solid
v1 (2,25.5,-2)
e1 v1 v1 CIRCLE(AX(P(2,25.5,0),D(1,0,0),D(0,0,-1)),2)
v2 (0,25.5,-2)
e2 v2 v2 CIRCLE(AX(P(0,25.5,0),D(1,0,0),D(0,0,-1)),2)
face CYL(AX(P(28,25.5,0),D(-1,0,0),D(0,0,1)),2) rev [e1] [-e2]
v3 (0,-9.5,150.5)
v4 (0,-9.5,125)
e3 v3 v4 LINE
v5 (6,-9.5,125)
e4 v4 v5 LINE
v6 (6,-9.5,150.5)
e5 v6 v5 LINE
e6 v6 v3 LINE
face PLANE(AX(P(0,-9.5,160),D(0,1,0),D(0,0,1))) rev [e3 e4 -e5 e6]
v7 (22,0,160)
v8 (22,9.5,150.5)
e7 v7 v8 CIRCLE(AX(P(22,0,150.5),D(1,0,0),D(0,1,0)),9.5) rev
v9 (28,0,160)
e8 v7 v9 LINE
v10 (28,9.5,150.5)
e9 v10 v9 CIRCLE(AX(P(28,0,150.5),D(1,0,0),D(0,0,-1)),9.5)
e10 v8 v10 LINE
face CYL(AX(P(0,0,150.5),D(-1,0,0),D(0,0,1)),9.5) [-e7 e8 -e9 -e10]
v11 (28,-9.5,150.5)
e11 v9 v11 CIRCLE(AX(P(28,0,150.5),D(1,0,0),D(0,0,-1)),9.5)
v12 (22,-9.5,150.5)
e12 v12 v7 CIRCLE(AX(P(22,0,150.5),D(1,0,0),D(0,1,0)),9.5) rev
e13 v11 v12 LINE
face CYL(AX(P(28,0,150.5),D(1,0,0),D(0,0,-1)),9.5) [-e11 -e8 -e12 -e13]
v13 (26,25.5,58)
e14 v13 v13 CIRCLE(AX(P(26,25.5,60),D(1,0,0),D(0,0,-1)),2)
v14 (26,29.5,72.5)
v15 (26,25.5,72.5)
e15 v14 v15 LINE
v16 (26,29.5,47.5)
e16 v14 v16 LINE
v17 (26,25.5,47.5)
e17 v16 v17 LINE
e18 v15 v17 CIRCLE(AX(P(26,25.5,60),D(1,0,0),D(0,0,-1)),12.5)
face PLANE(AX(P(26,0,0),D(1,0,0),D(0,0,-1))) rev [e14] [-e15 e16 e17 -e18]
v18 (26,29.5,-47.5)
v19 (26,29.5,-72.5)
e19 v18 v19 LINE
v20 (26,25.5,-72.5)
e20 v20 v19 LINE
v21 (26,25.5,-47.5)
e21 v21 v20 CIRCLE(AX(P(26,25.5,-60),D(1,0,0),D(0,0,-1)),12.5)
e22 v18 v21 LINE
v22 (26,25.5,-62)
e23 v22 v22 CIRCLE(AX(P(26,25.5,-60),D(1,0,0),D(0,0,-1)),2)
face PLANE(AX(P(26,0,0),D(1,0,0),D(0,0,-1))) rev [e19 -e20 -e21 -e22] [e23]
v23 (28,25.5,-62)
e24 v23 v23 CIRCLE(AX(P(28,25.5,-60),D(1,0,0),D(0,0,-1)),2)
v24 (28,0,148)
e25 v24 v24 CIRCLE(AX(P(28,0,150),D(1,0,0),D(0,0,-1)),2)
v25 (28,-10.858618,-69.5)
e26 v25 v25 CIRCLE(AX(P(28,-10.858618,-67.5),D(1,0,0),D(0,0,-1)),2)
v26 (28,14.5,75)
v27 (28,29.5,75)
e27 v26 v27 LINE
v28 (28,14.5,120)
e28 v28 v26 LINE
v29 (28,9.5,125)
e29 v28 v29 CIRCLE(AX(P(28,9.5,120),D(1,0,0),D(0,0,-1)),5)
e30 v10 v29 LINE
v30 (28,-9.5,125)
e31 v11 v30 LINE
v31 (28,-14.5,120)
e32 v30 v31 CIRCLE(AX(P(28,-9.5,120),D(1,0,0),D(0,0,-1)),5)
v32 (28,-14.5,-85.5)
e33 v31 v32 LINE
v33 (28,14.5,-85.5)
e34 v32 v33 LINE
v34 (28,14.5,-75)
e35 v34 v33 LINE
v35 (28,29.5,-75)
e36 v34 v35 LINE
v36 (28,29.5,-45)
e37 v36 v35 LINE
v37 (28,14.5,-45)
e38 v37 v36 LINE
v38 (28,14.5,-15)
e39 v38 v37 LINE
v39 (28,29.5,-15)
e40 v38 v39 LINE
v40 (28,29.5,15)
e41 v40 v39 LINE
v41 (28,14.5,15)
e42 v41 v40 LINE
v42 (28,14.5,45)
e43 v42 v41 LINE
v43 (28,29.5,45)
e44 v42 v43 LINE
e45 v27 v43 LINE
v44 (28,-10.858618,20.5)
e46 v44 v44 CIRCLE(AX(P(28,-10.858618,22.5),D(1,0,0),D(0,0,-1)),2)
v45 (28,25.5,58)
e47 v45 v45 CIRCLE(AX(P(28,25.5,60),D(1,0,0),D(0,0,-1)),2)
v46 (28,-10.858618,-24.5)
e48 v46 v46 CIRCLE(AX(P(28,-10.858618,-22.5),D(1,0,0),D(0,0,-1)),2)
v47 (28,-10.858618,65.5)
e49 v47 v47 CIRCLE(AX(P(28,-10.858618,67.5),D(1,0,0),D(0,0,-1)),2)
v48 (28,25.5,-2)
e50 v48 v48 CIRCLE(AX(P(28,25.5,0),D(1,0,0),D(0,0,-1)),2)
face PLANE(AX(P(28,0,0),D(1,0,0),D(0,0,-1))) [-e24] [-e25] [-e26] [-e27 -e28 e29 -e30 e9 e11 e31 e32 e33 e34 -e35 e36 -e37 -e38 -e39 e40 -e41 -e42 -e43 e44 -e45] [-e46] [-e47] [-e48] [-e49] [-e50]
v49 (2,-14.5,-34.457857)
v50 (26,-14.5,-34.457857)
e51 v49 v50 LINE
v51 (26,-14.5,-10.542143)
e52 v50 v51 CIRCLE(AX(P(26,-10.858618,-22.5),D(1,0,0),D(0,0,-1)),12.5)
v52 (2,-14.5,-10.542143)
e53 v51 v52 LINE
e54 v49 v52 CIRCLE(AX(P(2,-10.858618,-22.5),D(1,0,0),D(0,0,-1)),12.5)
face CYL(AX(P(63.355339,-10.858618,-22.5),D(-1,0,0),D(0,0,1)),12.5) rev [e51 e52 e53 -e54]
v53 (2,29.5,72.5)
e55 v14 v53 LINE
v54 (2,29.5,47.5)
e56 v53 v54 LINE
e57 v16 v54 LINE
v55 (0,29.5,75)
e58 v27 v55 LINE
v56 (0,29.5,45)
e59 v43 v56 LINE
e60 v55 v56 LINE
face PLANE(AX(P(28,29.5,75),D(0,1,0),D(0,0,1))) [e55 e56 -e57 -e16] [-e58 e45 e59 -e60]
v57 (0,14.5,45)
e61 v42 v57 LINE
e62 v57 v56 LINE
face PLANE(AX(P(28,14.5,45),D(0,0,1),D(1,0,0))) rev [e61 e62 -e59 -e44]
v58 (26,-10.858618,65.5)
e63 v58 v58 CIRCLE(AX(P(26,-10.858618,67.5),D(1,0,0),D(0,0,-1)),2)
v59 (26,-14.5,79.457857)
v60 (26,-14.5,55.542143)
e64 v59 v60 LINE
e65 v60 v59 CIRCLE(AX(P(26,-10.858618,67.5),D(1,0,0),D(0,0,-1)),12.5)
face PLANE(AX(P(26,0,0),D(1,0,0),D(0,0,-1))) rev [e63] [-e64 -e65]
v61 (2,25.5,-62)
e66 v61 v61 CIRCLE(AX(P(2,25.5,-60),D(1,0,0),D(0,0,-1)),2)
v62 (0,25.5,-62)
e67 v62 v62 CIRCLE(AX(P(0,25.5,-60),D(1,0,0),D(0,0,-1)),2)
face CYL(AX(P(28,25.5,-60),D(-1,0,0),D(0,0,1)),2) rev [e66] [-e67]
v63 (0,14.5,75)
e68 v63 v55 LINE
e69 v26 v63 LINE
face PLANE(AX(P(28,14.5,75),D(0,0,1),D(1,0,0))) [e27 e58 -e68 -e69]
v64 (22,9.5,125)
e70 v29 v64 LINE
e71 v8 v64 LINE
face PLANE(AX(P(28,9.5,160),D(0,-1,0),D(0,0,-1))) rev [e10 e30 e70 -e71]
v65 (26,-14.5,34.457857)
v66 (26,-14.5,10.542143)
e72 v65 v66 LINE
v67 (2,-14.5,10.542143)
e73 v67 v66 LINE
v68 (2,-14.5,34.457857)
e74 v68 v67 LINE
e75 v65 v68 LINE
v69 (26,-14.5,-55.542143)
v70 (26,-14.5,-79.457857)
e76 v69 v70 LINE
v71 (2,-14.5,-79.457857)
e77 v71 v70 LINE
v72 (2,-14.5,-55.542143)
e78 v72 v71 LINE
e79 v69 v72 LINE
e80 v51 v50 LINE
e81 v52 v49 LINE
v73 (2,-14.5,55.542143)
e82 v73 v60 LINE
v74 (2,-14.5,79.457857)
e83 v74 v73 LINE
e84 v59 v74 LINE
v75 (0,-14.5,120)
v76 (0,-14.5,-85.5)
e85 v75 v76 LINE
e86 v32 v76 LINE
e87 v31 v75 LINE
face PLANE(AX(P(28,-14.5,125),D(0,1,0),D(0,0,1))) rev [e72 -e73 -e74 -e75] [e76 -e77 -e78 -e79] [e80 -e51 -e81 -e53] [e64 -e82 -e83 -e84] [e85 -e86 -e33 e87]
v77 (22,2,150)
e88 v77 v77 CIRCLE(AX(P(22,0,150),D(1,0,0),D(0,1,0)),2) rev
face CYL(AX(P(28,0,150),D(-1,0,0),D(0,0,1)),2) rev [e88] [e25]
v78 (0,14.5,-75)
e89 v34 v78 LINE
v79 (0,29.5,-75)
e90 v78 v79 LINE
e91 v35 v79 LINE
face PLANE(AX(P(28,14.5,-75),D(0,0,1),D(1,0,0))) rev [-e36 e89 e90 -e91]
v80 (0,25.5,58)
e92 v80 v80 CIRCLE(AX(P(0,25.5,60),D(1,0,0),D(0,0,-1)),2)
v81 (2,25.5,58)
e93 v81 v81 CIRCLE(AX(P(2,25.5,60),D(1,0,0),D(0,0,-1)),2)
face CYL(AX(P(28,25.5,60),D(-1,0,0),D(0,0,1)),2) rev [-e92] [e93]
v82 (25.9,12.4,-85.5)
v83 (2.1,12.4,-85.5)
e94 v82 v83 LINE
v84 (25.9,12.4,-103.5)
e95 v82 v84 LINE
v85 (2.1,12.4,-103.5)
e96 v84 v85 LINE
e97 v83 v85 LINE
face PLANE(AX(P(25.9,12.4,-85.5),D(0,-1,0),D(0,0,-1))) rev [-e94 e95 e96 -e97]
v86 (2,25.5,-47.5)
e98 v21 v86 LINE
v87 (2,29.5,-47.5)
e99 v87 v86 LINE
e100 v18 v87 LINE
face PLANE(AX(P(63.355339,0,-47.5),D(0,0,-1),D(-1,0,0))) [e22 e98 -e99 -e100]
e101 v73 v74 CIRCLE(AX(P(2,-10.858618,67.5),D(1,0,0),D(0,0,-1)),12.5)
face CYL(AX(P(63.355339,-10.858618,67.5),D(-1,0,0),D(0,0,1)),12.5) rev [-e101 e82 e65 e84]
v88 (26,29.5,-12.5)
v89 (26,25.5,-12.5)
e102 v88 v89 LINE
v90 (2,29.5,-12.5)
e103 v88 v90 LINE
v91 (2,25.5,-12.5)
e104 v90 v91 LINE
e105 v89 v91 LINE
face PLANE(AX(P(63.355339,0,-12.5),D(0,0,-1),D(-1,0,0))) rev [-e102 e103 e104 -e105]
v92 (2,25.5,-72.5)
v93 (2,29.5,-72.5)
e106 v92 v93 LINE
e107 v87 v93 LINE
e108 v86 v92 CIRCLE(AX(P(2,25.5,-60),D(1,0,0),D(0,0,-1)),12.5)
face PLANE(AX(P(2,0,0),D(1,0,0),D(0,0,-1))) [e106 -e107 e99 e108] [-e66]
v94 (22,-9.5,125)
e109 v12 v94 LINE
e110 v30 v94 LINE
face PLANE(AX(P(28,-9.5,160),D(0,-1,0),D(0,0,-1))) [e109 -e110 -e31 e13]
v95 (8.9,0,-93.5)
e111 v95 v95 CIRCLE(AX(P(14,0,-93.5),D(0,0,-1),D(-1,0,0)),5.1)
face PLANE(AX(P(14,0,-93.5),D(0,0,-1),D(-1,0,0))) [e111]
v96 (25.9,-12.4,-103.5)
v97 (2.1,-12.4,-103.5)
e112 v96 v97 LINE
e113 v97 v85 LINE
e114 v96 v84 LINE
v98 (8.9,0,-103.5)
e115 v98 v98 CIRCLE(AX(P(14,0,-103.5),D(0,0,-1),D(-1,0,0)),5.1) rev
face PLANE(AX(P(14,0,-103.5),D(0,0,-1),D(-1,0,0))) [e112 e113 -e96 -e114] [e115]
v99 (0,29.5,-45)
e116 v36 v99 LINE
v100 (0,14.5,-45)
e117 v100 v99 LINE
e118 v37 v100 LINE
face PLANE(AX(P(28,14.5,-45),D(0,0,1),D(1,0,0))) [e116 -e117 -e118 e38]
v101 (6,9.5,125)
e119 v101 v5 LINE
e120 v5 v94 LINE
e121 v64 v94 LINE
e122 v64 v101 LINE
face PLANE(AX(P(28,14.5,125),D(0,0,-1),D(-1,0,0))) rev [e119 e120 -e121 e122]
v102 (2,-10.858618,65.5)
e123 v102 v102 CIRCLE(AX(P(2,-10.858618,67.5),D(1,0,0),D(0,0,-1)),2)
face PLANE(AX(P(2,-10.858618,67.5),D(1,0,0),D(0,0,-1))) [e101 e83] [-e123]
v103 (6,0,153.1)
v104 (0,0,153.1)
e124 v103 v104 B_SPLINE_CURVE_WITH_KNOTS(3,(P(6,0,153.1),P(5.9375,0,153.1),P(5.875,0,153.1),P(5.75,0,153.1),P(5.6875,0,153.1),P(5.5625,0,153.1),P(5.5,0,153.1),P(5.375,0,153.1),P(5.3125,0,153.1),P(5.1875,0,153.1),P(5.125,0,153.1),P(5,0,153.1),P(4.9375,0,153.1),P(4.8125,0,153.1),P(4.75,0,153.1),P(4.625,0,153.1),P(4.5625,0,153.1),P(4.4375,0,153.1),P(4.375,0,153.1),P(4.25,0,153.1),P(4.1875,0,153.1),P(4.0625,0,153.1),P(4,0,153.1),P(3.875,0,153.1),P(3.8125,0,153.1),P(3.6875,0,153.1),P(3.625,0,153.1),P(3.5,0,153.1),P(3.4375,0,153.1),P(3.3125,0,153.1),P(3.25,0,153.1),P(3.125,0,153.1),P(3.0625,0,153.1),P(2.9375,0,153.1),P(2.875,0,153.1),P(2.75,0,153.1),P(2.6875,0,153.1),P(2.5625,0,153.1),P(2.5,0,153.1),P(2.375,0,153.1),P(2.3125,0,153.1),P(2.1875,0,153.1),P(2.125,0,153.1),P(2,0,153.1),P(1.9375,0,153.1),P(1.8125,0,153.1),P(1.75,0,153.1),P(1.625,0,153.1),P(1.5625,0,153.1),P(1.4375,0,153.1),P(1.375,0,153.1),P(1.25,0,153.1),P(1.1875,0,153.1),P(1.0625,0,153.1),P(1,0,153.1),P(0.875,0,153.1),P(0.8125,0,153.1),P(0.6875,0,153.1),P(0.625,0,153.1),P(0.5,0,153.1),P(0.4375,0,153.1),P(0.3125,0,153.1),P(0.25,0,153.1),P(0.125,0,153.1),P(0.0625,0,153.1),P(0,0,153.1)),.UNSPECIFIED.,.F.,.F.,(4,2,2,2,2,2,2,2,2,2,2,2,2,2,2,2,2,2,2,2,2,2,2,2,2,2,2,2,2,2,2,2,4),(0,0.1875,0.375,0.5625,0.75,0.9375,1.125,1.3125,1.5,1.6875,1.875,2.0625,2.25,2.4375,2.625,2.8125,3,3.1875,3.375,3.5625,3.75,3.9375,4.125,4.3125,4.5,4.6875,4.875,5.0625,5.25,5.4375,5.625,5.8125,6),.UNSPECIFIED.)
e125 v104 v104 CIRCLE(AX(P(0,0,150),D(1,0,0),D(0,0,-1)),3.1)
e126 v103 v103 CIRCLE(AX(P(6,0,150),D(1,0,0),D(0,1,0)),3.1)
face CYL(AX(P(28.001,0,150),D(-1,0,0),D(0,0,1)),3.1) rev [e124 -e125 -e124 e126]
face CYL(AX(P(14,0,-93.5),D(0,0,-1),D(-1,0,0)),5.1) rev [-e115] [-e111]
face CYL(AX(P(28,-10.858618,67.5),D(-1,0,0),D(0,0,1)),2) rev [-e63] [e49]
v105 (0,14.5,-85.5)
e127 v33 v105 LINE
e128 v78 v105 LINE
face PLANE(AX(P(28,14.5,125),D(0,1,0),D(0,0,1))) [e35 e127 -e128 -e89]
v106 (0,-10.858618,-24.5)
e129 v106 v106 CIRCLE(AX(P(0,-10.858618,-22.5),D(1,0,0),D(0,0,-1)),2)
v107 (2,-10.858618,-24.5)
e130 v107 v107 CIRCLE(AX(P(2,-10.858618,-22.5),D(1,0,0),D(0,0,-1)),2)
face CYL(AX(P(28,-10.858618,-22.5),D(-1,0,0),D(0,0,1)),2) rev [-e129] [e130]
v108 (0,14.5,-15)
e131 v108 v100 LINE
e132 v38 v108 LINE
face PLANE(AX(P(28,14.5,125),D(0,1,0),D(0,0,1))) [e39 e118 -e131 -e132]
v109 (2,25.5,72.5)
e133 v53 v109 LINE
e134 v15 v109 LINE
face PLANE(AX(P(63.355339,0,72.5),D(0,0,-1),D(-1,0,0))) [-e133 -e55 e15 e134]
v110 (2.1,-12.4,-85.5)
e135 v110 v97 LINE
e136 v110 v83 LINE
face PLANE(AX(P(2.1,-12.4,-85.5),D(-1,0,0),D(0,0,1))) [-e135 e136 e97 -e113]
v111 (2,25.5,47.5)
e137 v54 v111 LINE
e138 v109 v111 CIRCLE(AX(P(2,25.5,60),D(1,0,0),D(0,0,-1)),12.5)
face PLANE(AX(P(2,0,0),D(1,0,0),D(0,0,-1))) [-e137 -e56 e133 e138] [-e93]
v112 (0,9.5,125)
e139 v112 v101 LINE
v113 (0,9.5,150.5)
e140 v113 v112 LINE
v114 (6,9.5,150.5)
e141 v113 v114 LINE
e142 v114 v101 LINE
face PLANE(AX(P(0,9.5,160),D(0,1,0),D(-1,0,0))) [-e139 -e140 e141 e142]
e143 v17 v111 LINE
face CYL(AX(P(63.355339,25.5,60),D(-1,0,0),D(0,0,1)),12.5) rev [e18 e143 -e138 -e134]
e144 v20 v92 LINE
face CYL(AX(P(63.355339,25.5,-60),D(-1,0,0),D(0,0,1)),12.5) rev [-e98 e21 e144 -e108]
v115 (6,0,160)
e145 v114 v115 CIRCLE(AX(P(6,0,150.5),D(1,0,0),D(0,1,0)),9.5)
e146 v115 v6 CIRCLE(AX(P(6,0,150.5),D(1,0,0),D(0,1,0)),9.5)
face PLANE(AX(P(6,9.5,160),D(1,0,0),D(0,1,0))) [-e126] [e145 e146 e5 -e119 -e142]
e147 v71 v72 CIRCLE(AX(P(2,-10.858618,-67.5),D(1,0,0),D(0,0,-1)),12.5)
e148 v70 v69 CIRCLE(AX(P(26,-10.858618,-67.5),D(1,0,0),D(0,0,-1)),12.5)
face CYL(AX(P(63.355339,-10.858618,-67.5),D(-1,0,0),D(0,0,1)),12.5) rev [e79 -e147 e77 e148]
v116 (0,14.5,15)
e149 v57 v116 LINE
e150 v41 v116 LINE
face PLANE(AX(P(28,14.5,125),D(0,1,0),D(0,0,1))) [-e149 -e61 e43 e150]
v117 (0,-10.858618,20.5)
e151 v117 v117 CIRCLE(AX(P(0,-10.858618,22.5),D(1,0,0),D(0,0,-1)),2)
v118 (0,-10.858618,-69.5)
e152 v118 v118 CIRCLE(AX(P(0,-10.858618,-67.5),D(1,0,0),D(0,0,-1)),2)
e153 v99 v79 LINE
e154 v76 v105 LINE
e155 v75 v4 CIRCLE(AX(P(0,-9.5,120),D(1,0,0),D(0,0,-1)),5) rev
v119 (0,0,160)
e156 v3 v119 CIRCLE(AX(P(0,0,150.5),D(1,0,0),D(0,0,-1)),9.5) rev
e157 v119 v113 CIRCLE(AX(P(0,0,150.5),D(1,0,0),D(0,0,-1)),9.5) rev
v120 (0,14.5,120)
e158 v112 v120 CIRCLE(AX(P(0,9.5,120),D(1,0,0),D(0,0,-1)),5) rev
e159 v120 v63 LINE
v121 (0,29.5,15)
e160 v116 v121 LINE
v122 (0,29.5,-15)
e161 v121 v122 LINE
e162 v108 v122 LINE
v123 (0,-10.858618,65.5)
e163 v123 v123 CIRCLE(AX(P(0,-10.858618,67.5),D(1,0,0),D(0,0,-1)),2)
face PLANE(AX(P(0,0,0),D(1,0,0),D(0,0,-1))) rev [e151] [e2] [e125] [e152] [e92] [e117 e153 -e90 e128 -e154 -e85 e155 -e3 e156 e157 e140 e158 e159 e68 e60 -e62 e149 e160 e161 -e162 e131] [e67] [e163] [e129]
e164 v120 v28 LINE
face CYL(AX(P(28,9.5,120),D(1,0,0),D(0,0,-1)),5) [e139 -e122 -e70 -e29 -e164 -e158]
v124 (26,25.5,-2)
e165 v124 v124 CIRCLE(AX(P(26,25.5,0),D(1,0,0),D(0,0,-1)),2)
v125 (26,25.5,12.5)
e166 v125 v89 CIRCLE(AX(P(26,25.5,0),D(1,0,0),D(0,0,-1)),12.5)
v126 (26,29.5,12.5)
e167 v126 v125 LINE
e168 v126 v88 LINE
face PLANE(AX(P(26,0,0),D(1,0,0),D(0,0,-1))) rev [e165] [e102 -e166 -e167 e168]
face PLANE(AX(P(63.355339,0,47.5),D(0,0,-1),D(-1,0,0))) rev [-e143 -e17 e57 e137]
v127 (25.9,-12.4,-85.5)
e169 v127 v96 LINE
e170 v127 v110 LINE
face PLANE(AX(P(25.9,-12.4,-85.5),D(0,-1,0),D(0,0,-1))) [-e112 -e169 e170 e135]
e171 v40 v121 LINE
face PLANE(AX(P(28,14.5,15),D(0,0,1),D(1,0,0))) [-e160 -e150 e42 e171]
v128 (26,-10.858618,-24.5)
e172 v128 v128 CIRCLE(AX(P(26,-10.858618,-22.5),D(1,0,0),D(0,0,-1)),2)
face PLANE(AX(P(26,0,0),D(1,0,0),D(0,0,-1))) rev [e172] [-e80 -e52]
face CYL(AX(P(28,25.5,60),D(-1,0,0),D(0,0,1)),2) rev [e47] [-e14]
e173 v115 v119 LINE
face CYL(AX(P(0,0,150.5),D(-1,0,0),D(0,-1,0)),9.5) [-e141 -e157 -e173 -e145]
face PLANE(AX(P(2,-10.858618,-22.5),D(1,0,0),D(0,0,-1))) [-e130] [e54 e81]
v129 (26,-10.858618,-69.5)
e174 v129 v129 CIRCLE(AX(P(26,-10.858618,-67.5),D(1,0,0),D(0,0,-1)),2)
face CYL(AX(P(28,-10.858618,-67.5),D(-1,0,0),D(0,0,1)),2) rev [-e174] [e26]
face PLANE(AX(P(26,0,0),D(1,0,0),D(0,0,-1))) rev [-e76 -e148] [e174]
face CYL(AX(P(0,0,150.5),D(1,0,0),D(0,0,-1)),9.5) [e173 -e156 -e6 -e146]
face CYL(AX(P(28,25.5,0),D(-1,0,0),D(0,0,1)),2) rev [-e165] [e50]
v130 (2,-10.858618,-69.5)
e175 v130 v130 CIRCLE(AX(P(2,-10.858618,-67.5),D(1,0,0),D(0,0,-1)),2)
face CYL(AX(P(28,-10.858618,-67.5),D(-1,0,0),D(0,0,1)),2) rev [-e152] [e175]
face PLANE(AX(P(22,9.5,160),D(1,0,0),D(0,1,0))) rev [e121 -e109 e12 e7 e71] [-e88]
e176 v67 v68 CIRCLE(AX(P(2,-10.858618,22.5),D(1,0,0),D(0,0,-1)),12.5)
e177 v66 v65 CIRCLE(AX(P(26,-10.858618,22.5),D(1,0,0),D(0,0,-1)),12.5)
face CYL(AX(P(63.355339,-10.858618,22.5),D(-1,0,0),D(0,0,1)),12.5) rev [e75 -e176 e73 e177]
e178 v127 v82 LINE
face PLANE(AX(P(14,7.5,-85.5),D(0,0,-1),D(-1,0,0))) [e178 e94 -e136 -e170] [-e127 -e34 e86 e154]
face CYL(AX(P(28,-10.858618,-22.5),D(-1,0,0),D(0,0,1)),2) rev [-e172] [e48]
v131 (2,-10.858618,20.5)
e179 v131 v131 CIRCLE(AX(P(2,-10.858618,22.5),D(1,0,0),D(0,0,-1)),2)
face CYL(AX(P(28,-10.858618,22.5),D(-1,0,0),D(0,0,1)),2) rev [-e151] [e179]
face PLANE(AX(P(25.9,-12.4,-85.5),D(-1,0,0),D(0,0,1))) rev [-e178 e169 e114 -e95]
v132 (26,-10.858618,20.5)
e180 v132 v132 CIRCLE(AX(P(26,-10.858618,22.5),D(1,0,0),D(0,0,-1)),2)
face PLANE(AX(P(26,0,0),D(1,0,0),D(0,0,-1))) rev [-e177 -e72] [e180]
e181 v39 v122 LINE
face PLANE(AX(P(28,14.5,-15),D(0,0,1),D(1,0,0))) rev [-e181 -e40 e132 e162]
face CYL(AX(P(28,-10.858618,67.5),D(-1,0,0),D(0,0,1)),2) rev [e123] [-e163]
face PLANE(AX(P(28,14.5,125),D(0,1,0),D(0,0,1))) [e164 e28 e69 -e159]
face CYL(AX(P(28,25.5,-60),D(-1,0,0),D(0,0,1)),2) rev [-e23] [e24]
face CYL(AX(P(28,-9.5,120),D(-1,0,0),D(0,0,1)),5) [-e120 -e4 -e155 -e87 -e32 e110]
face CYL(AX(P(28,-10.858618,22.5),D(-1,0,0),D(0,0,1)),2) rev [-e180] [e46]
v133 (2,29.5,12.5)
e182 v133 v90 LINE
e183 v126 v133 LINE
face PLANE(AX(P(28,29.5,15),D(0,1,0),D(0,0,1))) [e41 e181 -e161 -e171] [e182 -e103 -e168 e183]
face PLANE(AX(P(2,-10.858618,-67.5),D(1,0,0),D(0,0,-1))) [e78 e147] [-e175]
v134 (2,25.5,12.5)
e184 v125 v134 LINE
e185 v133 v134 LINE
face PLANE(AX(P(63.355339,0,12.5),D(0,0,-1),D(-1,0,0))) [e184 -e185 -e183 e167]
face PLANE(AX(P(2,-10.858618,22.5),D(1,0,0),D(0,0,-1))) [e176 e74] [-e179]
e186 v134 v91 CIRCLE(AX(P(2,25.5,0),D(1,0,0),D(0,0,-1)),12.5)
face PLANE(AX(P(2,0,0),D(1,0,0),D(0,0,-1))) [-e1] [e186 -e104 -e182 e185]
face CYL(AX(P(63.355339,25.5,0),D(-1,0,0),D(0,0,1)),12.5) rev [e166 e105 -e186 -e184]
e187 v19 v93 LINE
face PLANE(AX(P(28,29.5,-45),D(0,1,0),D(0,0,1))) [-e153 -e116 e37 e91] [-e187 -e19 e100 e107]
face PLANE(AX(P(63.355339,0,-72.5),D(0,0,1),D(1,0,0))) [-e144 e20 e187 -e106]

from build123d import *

# Parameters (mm, degrees)
SKETCH_1_W           = 250
SKETCH_1_H           = 29
SKETCH_1_W_2         = 30
SKETCH_1_H_2         = 15
EXTRUDE_1_DEPTH      = 28
SKETCH_1_3_R         = 2
CUT_EXTRUDE_1_DEPTH  = 132.450561049
CUT_EXTRUDE_START    = 2
SKETCH_1_5_R         = 2
CUT_EXTRUDE_2_DEPTH  = 24
SKETCH_3_W           = 6
SKETCH_3_H           = 19
EXTRUDE_2_DEPTH      = 35
SKETCH_3_3_W         = 6
SKETCH_3_3_H         = 19
EXTRUDE_3_DEPTH      = 35
SKETCH_1_6_R         = 2
CUT_EXTRUDE_3_DEPTH  = 166.088612569
CUT_EXTRUDE_7_REACH  = 167.089
SKETCH_1_8_R         = 3.1
FILLET_1_R           = 9.5
FILLET_2_R           = 5
SKETCH_4_R           = 5.1
CUT_EXTRUDE_4_DEPTH  = 31.5
SKETCH_4_2_OUTSIDE_W = 87.946
SKETCH_4_2_OUTSIDE_H = 103.946
SKETCH_4_2_OUTSIDE_R = 5.1
CUT_EXTRUDE_5_DEPTH  = 21.5
SKETCH_5_OUTSIDE_W   = 83.722
SKETCH_5_OUTSIDE_H   = 99.722
SKETCH_5_OUTSIDE_W_2 = 23.8
SKETCH_5_OUTSIDE_H_2 = 24.8
CUT_EXTRUDE_6_DEPTH  = 18


with BuildPart() as part:
    # 草图1 → 凸台-拉伸1 (new body)
    with BuildSketch(Plane(origin=(0, 0, 0), x_dir=(0, 0, -1), z_dir=(1, 0, 0))):
        Rectangle(SKETCH_1_W, SKETCH_1_H)
        with Locations((-60, 22)):
            Rectangle(SKETCH_1_W_2, SKETCH_1_H_2)
        with Locations((0, 22)):
            Rectangle(SKETCH_1_W_2, SKETCH_1_H_2)
        with Locations((60, 22)):
            Rectangle(SKETCH_1_W_2, SKETCH_1_H_2)
    extrude(amount=EXTRUDE_1_DEPTH)

    # 草图1<3> → 切除-拉伸1 (cut, through all)
    with BuildSketch(Plane(origin=(0, 0, 0), x_dir=(0, 0, -1), z_dir=(1, 0, 0))):
        with Locations((-67.5, -10.858617882)):
            Circle(SKETCH_1_3_R)
        with Locations((-22.5, -10.858617882)):
            Circle(SKETCH_1_3_R)
        with Locations((22.5, -10.858617882)):
            Circle(SKETCH_1_3_R)
        with Locations((-60, 25.5)):
            Circle(SKETCH_1_3_R)
        with Locations((67.5, -10.858617882)):
            Circle(SKETCH_1_3_R)
        with Locations((0, 25.5)):
            Circle(SKETCH_1_3_R)
        with Locations((60, 25.5)):
            Circle(SKETCH_1_3_R)
    extrude(amount=CUT_EXTRUDE_1_DEPTH, mode=Mode.SUBTRACT)

    # 草图1<5> → 切除-拉伸2 (cut)
    # profile 1 of 7: a face of its own
    with BuildSketch(Plane(origin=(0, 0, 0), x_dir=(0, 0, -1), z_dir=(1, 0, 0)).offset(CUT_EXTRUDE_START)):
        with BuildLine():
            Line((-72.5, 29.5), (-72.5, 25.5))
            ThreePointArc((-72.5, 25.5), (-60, 13), (-47.5, 25.5))
            Line((-47.5, 25.5), (-47.5, 29.5))
            Line((-47.5, 29.5), (-72.5, 29.5))
        make_face()
        with Locations((-60, 25.5)):
            Circle(SKETCH_1_5_R, mode=Mode.SUBTRACT)
    # profile 2 of 7: a face of its own
    with BuildSketch(Plane(origin=(0, 0, 0), x_dir=(0, 0, -1), z_dir=(1, 0, 0)).offset(CUT_EXTRUDE_START)):
        with BuildLine():
            Line((-79.457856675, -14.5), (-55.542143325, -14.5))
            ThreePointArc((-55.542143325, -14.5), (-67.5, 1.641382118), (-79.457856675, -14.5))
        make_face()
        with Locations((-67.5, -10.858617882)):
            Circle(SKETCH_1_5_R, mode=Mode.SUBTRACT)
    # profile 3 of 7: a face of its own
    with BuildSketch(Plane(origin=(0, 0, 0), x_dir=(0, 0, -1), z_dir=(1, 0, 0)).offset(CUT_EXTRUDE_START)):
        with BuildLine():
            Line((-34.457856675, -14.5), (-10.542143325, -14.5))
            ThreePointArc((-10.542143325, -14.5), (-22.5, 1.641382118), (-34.457856675, -14.5))
        make_face()
        with Locations((-22.5, -10.858617882)):
            Circle(SKETCH_1_5_R, mode=Mode.SUBTRACT)
    # profile 4 of 7: a face of its own
    with BuildSketch(Plane(origin=(0, 0, 0), x_dir=(0, 0, -1), z_dir=(1, 0, 0)).offset(CUT_EXTRUDE_START)):
        with BuildLine():
            ThreePointArc((-12.5, 25.5), (0, 13), (12.5, 25.5))
            Line((12.5, 25.5), (12.5, 29.5))
            Line((12.5, 29.5), (-12.5, 29.5))
            Line((-12.5, 29.5), (-12.5, 25.5))
        make_face()
        with Locations((0, 25.5)):
            Circle(SKETCH_1_5_R, mode=Mode.SUBTRACT)
    # profile 5 of 7: a face of its own
    with BuildSketch(Plane(origin=(0, 0, 0), x_dir=(0, 0, -1), z_dir=(1, 0, 0)).offset(CUT_EXTRUDE_START)):
        with BuildLine():
            Line((10.542143325, -14.5), (34.457856675, -14.5))
            ThreePointArc((34.457856675, -14.5), (22.5, 1.641382118), (10.542143325, -14.5))
        make_face()
        with Locations((22.5, -10.858617882)):
            Circle(SKETCH_1_5_R, mode=Mode.SUBTRACT)
    # profile 6 of 7: a face of its own
    with BuildSketch(Plane(origin=(0, 0, 0), x_dir=(0, 0, -1), z_dir=(1, 0, 0)).offset(CUT_EXTRUDE_START)):
        with BuildLine():
            Line((55.542143325, -14.5), (79.457856675, -14.5))
            ThreePointArc((79.457856675, -14.5), (67.5, 1.641382118), (55.542143325, -14.5))
        make_face()
        with Locations((67.5, -10.858617882)):
            Circle(SKETCH_1_5_R, mode=Mode.SUBTRACT)
    # profile 7 of 7: a face of its own
    with BuildSketch(Plane(origin=(0, 0, 0), x_dir=(0, 0, -1), z_dir=(1, 0, 0)).offset(CUT_EXTRUDE_START)):
        with BuildLine():
            ThreePointArc((47.5, 25.5), (60, 13), (72.5, 25.5))
            Line((72.5, 25.5), (72.5, 29.5))
            Line((72.5, 29.5), (47.5, 29.5))
            Line((47.5, 29.5), (47.5, 25.5))
        make_face()
        with Locations((60, 25.5)):
            Circle(SKETCH_1_5_R, mode=Mode.SUBTRACT)
    extrude(amount=CUT_EXTRUDE_2_DEPTH, mode=Mode.SUBTRACT)

    # 草图3 → 凸台-拉伸2 (add)
    with BuildSketch(Plane.XY.offset(125)):
        with Locations((25, 0)):
            Rectangle(SKETCH_3_W, SKETCH_3_H)
    extrude(amount=EXTRUDE_2_DEPTH)

    # 草图3<3> → 凸台-拉伸3 (add)
    with BuildSketch(Plane.XY.offset(125)):
        with Locations((25, 0)):
            Rectangle(SKETCH_3_3_W, SKETCH_3_3_H)
        with Locations((3, 0)):
            Rectangle(SKETCH_3_3_W, SKETCH_3_3_H)
    extrude(amount=EXTRUDE_3_DEPTH)

    # 草图1<6> → 切除-拉伸3 (cut, through all)
    with BuildSketch(Plane(origin=(0, 0, 0), x_dir=(0, 0, -1), z_dir=(1, 0, 0))):
        with Locations(Location((-150, 0, 0), (0, 0, 90))):
            Circle(SKETCH_1_6_R)
    extrude(amount=CUT_EXTRUDE_3_DEPTH, mode=Mode.SUBTRACT)

    # 草图1<8> → 切除-拉伸7 (cut, up to next)
    with BuildSketch(Plane(origin=(0, 0, 0), x_dir=(0, 0, -1), z_dir=(1, 0, 0)), mode=Mode.PRIVATE) as cut_extrude_7_sk1:
        with Locations(Location((-150, 0, 0), (0, 0, 180))):
            Circle(SKETCH_1_8_R)
    cut_extrude_7_tool1 = extrude(cut_extrude_7_sk1.sketch, amount=CUT_EXTRUDE_7_REACH, mode=Mode.PRIVATE) & part.part
    add(cut_extrude_7_tool1.solids().sort_by_distance((0, 0, 150))[0], mode=Mode.SUBTRACT)

    # 圆角1
    fillet_1_edges = [part.edges().sort_by_distance(p)[0] for p in [
        (25, 9.5, 160),
        (25, -9.5, 160),
        (3, -9.5, 160),
        (3, 9.5, 160),
    ]]
    fillet(fillet_1_edges, radius=FILLET_1_R - 0.0001)  # a hair under: the kernel refuses the full size

    # 圆角2
    fillet_2_edges = [part.edges().sort_by_distance(p)[0] for p in [
        (14, -14.5, 125),
        (14, 14.5, 125),
    ]]
    fillet(fillet_2_edges, radius=FILLET_2_R)

    # 草图4 → 切除-拉伸4 (cut)
    with BuildSketch(Plane(origin=(0, 0, -125), x_dir=(-1, 0, 0), z_dir=(0, 0, -1))):
        with Locations((-14, 0)):
            Circle(SKETCH_4_R)
    extrude(amount=-CUT_EXTRUDE_4_DEPTH, mode=Mode.SUBTRACT)

    # 草图4<2> outside → 切除-拉伸5 (cut)
    with BuildSketch(Plane(origin=(0, 0, -125), x_dir=(-1, 0, 0), z_dir=(0, 0, -1))):
        with Locations((-14, 7.5)):
            Rectangle(SKETCH_4_2_OUTSIDE_W, SKETCH_4_2_OUTSIDE_H)
        with Locations((-14, 0)):
            Circle(SKETCH_4_2_OUTSIDE_R, mode=Mode.SUBTRACT)
    extrude(amount=-CUT_EXTRUDE_5_DEPTH, mode=Mode.SUBTRACT)

    # 草图5 outside → 切除-拉伸6 (cut)
    with BuildSketch(Plane(origin=(0, 0, -103.5), x_dir=(-1, 0, 0), z_dir=(0, 0, -1))):
        with Locations((-14, 7.5)):
            Rectangle(SKETCH_5_OUTSIDE_W, SKETCH_5_OUTSIDE_H)
        with Locations((-14, 0)):
            Rectangle(SKETCH_5_OUTSIDE_W_2, SKETCH_5_OUTSIDE_H_2, mode=Mode.SUBTRACT)
    extrude(amount=-CUT_EXTRUDE_6_DEPTH, mode=Mode.SUBTRACT)


solid = part.part
